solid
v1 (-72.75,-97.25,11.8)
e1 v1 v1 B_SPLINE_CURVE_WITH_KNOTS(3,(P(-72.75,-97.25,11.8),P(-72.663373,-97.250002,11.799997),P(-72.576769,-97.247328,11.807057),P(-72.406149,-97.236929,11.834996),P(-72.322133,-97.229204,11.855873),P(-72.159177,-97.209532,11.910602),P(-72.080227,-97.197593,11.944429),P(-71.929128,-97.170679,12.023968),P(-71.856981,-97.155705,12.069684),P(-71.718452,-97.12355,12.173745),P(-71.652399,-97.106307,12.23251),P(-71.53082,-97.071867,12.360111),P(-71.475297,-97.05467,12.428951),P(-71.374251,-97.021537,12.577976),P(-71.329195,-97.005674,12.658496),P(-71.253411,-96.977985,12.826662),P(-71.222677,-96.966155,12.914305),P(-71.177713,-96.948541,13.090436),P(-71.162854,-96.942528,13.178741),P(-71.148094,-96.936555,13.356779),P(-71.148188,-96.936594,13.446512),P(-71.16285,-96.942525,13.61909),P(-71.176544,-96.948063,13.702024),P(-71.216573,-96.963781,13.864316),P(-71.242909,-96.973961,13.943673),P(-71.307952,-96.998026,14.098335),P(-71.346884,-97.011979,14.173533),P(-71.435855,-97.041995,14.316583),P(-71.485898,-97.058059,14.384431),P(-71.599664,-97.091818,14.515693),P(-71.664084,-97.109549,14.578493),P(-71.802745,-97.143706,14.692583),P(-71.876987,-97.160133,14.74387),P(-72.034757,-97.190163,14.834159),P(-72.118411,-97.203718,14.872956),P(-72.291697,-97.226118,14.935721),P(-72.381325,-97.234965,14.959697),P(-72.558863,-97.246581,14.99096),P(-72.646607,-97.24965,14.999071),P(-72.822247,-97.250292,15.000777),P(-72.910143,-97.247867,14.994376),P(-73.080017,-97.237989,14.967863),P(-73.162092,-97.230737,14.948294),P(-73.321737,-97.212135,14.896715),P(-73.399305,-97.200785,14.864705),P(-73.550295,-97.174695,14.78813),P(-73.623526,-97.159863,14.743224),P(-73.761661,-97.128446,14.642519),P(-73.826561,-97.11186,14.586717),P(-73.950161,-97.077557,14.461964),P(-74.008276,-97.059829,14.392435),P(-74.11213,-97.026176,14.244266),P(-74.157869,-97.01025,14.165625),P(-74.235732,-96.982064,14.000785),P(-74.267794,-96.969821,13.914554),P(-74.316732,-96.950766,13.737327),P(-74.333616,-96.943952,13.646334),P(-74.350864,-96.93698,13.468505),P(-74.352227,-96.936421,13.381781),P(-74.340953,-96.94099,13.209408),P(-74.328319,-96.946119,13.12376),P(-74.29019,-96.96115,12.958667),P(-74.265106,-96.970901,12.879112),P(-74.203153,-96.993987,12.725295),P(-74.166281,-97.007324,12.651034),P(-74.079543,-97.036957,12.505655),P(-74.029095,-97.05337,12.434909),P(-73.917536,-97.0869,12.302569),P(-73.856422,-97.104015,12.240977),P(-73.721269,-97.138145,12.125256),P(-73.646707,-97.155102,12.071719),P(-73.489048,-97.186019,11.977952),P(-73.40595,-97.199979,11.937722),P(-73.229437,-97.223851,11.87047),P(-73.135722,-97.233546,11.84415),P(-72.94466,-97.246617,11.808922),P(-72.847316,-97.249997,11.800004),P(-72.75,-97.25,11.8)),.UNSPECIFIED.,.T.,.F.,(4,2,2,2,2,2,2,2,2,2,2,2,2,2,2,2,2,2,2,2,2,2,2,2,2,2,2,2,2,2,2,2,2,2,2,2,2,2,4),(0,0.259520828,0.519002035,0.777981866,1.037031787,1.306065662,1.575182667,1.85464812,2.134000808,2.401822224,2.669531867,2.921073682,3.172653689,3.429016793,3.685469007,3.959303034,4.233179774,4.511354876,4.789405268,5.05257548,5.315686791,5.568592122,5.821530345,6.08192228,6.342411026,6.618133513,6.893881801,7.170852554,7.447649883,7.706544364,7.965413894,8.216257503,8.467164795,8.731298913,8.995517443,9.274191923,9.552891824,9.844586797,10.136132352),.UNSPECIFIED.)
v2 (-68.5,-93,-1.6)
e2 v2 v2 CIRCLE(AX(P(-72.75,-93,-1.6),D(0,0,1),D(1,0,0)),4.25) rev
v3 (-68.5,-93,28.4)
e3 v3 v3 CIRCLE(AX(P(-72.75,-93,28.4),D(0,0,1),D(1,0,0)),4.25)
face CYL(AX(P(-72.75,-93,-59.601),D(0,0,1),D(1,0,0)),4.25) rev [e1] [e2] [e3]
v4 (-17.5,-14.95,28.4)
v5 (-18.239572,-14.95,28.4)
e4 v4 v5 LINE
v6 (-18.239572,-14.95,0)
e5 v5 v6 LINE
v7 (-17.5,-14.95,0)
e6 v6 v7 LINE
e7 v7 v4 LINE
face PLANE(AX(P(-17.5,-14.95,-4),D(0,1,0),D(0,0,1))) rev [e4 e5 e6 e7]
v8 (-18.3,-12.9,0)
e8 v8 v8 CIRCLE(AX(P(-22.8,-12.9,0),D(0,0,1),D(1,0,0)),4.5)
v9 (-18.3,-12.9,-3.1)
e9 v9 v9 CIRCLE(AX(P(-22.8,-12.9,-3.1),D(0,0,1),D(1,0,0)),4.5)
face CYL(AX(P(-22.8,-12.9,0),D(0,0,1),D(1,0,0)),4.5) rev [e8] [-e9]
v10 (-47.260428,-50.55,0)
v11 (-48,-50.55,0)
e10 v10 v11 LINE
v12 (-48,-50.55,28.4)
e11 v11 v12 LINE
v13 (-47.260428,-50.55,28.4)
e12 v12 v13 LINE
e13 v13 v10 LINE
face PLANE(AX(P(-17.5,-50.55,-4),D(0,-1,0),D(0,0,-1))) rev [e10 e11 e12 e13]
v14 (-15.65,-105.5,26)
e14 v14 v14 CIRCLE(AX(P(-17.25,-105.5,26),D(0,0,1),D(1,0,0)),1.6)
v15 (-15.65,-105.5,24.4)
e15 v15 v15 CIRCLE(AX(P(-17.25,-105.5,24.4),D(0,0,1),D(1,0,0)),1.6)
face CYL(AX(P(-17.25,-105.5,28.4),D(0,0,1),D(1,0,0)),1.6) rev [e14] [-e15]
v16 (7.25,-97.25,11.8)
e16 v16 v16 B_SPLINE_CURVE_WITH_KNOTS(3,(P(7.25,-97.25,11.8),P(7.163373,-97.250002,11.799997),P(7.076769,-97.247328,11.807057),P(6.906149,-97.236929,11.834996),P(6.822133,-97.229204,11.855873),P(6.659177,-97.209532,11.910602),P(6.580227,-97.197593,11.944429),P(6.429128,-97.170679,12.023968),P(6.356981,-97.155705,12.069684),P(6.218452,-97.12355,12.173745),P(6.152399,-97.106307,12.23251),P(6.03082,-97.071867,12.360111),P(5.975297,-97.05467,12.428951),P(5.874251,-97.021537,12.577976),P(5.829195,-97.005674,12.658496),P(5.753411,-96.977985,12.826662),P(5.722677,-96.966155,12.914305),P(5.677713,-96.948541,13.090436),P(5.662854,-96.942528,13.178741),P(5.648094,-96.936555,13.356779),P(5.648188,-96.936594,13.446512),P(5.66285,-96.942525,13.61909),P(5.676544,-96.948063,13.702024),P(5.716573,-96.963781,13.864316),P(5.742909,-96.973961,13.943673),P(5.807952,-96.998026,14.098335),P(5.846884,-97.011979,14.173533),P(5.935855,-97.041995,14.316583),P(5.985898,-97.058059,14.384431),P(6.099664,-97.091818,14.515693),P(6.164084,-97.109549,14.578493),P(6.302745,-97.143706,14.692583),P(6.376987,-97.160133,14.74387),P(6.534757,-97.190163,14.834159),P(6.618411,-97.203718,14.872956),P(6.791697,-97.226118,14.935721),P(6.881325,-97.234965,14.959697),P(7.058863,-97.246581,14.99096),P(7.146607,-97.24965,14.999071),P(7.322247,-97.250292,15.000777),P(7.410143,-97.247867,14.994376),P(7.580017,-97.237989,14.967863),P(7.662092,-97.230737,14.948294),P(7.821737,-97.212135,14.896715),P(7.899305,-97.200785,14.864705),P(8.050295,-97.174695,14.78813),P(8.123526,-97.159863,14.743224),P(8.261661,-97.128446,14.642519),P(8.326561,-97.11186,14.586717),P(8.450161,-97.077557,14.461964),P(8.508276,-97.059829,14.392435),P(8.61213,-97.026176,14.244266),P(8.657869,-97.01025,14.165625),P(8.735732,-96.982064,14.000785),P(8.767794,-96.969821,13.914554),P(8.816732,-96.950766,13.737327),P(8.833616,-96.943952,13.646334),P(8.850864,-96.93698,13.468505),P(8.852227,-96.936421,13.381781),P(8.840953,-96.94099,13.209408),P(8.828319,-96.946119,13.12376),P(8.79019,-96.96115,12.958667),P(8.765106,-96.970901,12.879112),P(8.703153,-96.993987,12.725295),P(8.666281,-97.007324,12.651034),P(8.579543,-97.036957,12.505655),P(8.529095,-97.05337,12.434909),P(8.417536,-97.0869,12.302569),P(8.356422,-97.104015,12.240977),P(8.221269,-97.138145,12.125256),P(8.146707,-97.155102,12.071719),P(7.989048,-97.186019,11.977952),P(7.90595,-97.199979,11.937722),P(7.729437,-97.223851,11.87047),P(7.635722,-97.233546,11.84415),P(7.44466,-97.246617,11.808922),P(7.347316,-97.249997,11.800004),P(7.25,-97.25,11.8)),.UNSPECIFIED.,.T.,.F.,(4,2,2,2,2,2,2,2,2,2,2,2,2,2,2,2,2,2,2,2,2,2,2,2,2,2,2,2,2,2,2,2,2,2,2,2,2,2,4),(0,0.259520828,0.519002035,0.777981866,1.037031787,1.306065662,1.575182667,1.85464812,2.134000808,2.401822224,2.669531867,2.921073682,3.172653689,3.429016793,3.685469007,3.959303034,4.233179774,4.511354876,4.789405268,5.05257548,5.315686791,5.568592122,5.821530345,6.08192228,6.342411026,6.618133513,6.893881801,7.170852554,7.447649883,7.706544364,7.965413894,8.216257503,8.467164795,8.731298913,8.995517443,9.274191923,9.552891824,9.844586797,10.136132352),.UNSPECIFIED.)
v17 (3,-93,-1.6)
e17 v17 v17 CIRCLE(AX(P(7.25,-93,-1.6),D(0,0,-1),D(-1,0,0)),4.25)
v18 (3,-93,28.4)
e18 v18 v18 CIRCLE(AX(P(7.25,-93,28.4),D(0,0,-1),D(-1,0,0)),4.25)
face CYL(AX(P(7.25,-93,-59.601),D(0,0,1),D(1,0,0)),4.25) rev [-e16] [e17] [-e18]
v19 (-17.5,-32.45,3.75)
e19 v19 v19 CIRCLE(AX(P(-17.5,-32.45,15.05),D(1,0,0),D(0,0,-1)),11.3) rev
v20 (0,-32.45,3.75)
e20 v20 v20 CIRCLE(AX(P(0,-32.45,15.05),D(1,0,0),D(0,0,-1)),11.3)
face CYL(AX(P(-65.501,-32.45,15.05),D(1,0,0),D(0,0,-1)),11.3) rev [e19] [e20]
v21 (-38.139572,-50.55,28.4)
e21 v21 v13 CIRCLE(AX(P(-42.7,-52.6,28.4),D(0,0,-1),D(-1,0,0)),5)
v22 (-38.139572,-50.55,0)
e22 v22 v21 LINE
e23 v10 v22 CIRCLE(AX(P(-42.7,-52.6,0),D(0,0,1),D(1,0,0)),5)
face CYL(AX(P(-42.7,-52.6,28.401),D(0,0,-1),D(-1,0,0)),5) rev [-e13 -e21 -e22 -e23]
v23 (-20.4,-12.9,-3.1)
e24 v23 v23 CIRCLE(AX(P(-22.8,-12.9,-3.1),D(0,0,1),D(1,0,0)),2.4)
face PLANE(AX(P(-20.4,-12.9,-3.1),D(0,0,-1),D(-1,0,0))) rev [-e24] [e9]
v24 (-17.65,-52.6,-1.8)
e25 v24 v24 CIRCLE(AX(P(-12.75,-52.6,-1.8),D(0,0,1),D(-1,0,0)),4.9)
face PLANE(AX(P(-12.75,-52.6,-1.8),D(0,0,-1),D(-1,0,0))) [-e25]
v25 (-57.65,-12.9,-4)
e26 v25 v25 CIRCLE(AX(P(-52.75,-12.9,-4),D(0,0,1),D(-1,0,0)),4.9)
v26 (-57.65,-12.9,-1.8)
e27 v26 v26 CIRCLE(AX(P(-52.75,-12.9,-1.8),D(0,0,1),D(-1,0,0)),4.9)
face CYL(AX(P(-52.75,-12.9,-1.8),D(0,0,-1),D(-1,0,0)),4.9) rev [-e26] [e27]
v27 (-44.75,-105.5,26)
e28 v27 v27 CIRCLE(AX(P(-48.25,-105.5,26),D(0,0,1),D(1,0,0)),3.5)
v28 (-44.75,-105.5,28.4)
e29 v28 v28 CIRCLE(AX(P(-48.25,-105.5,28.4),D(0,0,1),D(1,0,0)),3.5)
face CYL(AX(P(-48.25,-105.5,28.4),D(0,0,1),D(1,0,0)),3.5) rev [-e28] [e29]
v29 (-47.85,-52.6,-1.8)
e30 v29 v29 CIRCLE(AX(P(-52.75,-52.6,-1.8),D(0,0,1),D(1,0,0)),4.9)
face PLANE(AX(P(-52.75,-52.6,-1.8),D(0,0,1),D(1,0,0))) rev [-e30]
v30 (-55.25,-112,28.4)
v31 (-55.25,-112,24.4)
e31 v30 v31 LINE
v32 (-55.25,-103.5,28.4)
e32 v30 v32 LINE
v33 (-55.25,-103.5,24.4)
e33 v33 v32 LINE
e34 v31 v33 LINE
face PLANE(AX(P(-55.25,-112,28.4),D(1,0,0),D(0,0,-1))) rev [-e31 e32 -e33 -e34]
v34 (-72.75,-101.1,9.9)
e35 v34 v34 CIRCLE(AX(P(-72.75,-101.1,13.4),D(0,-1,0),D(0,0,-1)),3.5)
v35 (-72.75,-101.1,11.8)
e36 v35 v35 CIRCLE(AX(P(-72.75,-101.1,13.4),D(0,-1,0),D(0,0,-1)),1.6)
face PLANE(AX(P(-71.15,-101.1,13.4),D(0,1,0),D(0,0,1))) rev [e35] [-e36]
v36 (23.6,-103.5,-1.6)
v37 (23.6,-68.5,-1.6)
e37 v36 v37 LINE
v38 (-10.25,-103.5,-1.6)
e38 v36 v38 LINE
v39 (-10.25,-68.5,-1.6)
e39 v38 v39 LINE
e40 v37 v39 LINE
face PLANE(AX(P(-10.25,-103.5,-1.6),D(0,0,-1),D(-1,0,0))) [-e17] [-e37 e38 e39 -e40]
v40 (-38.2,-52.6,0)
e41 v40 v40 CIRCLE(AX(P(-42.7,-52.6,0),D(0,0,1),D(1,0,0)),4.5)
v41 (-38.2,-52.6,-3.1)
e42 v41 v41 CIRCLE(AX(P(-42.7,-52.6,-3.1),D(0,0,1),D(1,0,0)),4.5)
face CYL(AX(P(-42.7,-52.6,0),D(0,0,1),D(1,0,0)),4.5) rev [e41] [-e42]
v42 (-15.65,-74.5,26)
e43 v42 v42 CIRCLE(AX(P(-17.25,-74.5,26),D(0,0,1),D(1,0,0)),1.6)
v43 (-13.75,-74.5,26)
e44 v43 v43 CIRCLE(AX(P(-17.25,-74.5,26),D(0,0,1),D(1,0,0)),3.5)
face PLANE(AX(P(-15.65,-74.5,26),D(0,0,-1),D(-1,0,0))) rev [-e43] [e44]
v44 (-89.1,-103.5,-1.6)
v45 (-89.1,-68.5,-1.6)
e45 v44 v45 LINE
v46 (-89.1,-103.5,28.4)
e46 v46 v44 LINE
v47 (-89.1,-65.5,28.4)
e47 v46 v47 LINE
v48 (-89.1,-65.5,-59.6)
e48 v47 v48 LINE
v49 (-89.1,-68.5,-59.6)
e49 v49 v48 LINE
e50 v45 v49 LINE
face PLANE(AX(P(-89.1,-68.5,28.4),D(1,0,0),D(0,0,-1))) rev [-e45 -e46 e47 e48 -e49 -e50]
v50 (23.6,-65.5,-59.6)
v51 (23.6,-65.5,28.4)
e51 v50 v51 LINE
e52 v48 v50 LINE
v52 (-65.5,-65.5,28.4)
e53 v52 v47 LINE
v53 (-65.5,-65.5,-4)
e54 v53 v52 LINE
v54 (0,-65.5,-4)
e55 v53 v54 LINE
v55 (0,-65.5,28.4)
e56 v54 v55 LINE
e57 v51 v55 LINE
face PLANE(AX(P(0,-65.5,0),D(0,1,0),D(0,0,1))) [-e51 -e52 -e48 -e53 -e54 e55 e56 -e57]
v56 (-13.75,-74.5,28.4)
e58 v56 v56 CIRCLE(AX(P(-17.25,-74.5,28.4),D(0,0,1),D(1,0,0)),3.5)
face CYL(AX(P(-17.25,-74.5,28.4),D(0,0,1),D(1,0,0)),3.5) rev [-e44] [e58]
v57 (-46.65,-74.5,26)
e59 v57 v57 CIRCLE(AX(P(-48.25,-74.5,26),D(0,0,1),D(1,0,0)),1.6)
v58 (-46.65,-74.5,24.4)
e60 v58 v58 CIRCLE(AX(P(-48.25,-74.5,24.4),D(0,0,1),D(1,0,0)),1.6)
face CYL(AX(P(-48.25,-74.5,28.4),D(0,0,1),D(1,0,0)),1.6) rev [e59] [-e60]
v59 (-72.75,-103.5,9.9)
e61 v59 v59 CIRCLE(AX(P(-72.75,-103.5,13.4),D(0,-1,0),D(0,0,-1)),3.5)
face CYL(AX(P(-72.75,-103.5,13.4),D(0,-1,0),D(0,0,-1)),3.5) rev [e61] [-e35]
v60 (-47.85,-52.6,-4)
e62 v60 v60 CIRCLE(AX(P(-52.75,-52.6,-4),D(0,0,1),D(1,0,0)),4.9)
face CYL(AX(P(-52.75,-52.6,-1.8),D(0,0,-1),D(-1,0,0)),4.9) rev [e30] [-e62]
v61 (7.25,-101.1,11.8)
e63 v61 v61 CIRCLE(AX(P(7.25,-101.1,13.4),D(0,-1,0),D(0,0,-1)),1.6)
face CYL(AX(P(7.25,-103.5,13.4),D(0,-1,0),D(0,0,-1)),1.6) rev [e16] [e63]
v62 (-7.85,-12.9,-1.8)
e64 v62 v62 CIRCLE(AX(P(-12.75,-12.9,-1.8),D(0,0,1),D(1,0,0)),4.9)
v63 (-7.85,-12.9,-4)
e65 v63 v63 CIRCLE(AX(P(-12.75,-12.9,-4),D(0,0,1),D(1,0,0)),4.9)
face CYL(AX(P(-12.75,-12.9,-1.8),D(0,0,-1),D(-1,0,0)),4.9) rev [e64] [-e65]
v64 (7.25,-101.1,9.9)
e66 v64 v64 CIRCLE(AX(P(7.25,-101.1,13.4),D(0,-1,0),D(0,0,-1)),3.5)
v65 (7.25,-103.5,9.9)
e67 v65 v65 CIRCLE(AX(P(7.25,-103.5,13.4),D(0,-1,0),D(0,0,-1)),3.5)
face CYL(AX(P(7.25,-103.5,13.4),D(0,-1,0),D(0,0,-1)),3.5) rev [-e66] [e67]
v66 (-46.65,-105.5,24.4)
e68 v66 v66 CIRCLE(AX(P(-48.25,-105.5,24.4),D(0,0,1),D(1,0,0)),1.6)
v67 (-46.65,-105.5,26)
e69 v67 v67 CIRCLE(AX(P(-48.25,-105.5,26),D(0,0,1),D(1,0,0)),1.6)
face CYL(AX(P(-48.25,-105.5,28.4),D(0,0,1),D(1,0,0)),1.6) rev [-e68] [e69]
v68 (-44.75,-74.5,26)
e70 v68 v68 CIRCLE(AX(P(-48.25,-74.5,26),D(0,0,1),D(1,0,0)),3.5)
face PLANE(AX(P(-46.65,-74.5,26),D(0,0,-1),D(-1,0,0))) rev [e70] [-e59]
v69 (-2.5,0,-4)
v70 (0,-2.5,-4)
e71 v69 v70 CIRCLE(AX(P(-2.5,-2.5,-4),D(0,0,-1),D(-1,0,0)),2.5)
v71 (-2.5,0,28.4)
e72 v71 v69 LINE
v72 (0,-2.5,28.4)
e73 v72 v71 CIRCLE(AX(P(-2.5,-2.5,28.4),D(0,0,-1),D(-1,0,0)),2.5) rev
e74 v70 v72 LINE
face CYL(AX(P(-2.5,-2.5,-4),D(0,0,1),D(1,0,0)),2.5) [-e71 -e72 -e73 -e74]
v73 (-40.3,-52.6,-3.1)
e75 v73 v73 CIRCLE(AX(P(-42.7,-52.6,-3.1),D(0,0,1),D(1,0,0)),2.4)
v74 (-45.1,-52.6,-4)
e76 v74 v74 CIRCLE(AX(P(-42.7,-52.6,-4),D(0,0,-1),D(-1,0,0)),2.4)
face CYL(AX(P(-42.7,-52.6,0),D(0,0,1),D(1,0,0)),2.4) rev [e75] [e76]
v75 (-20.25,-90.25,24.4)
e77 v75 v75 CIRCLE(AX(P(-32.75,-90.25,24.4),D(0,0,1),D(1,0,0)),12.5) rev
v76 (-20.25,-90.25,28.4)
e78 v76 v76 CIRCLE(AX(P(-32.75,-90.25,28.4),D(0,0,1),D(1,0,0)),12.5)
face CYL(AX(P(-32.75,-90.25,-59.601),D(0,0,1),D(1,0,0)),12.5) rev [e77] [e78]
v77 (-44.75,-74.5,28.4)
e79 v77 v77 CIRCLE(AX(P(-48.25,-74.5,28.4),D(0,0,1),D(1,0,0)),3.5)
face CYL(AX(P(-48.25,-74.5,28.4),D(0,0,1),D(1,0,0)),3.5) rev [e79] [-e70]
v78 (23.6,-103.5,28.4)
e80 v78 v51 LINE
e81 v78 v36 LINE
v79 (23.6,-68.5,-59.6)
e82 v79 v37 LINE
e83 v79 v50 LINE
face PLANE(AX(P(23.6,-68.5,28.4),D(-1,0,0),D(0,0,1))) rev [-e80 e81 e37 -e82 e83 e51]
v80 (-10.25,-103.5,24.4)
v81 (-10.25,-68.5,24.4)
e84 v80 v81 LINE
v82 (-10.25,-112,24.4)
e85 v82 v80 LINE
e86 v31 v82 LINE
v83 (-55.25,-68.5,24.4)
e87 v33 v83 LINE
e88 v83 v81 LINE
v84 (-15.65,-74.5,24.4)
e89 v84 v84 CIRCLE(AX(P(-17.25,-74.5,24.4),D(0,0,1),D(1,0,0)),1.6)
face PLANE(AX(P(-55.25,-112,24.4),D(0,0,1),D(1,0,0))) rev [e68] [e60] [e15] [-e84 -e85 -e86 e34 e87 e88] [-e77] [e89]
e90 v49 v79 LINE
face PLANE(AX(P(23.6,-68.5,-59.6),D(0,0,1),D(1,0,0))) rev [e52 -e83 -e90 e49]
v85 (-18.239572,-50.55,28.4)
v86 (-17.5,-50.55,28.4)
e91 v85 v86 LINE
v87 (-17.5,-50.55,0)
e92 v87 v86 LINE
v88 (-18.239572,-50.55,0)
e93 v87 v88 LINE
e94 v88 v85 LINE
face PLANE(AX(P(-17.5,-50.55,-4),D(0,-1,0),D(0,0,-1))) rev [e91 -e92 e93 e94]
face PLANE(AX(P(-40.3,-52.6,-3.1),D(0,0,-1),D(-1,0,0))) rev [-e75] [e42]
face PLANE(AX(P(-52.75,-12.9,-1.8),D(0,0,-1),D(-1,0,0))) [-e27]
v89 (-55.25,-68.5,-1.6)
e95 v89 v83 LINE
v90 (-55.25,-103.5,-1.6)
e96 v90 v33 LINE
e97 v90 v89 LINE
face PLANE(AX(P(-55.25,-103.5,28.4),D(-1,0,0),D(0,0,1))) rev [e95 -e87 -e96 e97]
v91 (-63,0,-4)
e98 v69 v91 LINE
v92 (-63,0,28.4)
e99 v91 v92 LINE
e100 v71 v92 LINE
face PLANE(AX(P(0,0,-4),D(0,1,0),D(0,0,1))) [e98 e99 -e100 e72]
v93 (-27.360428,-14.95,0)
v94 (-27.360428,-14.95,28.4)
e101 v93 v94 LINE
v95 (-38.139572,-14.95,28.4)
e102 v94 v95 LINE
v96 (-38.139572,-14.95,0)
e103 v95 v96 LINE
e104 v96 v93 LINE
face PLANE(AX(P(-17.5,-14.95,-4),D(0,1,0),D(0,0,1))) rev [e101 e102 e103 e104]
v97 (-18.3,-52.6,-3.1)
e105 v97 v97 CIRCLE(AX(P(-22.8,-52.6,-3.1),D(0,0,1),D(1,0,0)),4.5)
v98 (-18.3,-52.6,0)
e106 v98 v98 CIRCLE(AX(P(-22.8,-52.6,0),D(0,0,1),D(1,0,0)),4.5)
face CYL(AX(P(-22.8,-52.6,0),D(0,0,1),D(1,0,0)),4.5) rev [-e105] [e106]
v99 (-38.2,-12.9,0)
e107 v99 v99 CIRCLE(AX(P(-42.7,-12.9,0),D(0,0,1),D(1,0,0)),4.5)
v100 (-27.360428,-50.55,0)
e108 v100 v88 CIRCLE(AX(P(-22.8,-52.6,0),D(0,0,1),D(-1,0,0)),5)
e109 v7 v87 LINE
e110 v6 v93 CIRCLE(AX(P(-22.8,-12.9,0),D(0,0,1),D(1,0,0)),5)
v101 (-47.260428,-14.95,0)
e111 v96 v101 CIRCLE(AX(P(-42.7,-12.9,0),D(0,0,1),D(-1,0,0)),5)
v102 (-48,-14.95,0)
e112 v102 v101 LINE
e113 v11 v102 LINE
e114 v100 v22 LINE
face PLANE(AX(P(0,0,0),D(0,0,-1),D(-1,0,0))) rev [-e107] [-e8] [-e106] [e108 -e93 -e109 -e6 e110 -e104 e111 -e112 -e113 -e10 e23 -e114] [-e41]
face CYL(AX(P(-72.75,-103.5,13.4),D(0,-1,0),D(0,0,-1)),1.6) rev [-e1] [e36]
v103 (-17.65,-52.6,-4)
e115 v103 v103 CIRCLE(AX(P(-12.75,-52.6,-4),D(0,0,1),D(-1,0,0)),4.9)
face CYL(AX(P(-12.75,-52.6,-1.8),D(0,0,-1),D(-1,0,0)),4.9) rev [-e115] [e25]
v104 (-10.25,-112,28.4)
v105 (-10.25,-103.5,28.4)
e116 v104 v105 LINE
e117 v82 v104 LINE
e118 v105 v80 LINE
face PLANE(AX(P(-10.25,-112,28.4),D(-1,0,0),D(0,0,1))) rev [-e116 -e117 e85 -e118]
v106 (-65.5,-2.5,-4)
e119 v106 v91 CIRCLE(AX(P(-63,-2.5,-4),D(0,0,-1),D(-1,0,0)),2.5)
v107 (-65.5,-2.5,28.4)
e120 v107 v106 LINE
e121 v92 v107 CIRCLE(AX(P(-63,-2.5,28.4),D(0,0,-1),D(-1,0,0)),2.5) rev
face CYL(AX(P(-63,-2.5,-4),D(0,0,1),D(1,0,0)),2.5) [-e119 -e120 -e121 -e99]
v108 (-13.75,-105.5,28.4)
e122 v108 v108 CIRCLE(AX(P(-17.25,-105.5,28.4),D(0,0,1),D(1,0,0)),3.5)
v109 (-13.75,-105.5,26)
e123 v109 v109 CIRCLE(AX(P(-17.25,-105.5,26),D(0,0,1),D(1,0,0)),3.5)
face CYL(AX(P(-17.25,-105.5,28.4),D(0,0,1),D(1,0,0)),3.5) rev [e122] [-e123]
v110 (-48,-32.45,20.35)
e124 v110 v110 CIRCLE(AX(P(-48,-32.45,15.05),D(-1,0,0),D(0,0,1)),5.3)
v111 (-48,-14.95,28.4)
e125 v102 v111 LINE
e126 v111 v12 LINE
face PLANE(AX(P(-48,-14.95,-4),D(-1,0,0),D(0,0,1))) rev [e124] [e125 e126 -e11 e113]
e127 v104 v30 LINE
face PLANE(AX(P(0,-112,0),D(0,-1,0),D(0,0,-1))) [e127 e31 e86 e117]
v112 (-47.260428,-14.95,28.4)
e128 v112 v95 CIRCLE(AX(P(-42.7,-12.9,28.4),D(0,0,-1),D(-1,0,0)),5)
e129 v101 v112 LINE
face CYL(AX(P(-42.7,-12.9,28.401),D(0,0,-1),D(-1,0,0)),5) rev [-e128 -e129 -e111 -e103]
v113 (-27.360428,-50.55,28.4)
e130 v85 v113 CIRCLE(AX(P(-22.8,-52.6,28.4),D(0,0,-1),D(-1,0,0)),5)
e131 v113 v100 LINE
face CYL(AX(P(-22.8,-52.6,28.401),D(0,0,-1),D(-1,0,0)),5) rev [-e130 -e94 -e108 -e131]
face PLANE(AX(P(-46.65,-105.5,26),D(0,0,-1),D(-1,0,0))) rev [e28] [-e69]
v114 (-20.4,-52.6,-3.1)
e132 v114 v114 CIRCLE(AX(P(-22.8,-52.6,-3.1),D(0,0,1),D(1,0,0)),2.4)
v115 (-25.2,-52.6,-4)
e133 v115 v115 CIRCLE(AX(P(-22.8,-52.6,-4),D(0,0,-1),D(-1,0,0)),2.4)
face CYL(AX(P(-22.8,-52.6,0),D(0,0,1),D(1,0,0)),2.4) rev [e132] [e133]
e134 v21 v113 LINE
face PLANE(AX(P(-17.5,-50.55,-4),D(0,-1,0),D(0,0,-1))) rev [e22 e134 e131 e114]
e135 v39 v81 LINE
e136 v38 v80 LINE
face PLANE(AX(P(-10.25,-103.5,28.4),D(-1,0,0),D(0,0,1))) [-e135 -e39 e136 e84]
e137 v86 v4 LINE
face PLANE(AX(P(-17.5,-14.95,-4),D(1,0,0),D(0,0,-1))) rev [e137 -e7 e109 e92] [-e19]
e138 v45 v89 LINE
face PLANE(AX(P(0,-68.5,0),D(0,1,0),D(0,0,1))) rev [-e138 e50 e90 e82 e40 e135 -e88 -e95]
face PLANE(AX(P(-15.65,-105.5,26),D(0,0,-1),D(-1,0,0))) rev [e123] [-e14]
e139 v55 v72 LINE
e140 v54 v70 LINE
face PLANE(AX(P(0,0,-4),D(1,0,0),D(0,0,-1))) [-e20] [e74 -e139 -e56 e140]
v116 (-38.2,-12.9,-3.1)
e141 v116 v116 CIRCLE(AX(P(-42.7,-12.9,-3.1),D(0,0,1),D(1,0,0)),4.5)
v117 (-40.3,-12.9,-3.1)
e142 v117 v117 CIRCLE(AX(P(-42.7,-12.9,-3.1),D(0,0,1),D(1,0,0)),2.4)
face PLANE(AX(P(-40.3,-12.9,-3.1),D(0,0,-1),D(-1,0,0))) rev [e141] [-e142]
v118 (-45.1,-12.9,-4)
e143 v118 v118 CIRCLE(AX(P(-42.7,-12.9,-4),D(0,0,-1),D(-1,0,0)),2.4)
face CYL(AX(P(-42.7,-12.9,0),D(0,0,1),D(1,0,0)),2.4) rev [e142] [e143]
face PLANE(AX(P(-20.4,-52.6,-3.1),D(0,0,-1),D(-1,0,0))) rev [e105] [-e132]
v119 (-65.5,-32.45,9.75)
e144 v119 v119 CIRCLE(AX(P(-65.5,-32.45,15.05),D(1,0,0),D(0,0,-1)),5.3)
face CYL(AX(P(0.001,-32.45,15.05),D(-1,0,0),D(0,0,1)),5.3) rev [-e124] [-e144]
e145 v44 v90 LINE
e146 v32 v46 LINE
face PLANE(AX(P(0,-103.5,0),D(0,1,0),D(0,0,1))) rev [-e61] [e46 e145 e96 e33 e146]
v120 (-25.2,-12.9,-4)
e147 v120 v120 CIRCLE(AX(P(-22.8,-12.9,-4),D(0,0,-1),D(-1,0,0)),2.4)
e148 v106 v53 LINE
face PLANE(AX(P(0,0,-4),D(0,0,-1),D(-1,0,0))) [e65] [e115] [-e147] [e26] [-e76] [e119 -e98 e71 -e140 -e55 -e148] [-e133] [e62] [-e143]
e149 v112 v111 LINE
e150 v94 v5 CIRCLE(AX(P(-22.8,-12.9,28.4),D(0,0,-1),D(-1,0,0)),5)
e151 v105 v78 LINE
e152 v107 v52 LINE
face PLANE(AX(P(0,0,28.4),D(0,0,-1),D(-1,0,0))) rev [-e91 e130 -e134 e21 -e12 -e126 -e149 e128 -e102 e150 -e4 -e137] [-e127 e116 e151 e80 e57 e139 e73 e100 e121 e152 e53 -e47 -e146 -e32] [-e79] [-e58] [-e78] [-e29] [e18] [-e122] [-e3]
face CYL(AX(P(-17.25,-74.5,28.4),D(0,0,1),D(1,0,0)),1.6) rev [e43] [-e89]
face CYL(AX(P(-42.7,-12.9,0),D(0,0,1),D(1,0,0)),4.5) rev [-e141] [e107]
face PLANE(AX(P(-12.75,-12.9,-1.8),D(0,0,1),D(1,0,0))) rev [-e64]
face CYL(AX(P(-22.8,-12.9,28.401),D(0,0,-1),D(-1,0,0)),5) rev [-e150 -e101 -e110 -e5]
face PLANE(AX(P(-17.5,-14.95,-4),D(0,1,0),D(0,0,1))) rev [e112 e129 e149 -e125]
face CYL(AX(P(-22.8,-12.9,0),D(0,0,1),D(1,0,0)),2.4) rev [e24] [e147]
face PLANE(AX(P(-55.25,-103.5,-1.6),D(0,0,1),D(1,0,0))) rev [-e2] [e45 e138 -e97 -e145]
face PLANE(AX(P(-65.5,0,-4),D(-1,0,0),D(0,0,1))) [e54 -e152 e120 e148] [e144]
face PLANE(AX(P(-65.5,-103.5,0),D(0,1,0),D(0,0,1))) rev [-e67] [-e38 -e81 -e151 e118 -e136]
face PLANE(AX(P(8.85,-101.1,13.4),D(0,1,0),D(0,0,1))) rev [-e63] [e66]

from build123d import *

# Parameters (mm, degrees)
BOSS_EXTRUDE1_DEPTH                              = 28.4
BOSS_EXTRUDE1_DEPTH_BACK                         = 4
SKETCH1_W                                        = 65.5
SKETCH1_H                                        = 65.5
SKETCH1_W_2                                      = 30.5
SKETCH1_H_2                                      = 35.6
CUT_EXTRUDE1_REACH                               = 98.887
SKETCH5_R                                        = 11.3
CUT_EXTRUDE4_REACH                               = 98.887
SKETCH7_R                                        = 5.3
SKETCH8_W                                        = 30.5
SKETCH8_H                                        = 35.6
BOSS_EXTRUDE2_DEPTH                              = 4
SKETCH9_R                                        = 4.9
CUT_EXTRUDE5_DEPTH                               = 2.2
FILLET1_R                                        = 2.5
CUT_EXTRUDE7_REACH                               = 98.887
SKETCH10_R                                       = 5
CBORE_FOR_M4_PAN_HEAD_MACHINE_SCREW1_D           = 4.8
CBORE_FOR_M4_PAN_HEAD_MACHINE_SCREW1_DEPTH       = 8
CBORE_FOR_M4_PAN_HEAD_MACHINE_SCREW1_CBORE_D     = 9
CBORE_FOR_M4_PAN_HEAD_MACHINE_SCREW1_CBORE_DEPTH = 3.1
CBORE_FOR_M4_PAN_HEAD_MACHINE_SCREW1_TIP         = 1.442065486
SKETCH23_W                                       = 112.7
SKETCH23_H                                       = 88
BOSS_EXTRUDE3_DEPTH                              = 3
SKETCH24_W                                       = 45
SKETCH24_H                                       = 4
BOSS_EXTRUDE4_DEPTH                              = 43.5
CBORE_FOR_M3_PAN_HEAD_MACHINE_SCREW1_D           = 3.2
CBORE_FOR_M3_PAN_HEAD_MACHINE_SCREW1_CBORE_D     = 7
CBORE_FOR_M3_PAN_HEAD_MACHINE_SCREW1_CBORE_DEPTH = 2.4
CUT_EXTRUDE8_REACH                               = 170.008
SKETCH28_R                                       = 12.5
SKETCH30_W                                       = 33.85
SKETCH30_H                                       = 30
BOSS_EXTRUDE5_DEPTH                              = 35
CUT_EXTRUDE10_REACH                              = 170.008
SKETCH31_R                                       = 4.25
CBORE_START                                      = -103.5
CBORE_FOR_M3_PAN_HEAD_MACHINE_SCREW2_OUT_R       = 3.5
CBORE_FOR_M3_PAN_HEAD_MACHINE_SCREW2_DEPTH       = 2.4
CBORE_START_2                                    = -101.1
CBORE_FOR_M3_PAN_HEAD_MACHINE_SCREW2_2_O_R       = 1.6
CBORE_FOR_M3_PAN_HEAD_MACHINE_SCREW2_2_DEPTH     = 4.162673424


# Read off the part's stored shape, not the designer's step: CBORE for M3 Pan Head Machine Screw2
with BuildPart() as part:
    # Sketch1 → Boss-Extrude1 (new, two sides: drawn at the far end of the back side and taken through both)
    with BuildSketch(Plane.XY.offset(-BOSS_EXTRUDE1_DEPTH_BACK)):
        with Locations((-32.75, -32.75)):
            Rectangle(SKETCH1_W, SKETCH1_H)
        with Locations((-32.75, -32.75)):
            Rectangle(SKETCH1_W_2, SKETCH1_H_2, mode=Mode.SUBTRACT)
    extrude(amount=BOSS_EXTRUDE1_DEPTH + BOSS_EXTRUDE1_DEPTH_BACK)

    # Sketch5 → Cut-Extrude1 (cut, up to next)
    with BuildSketch(Plane(origin=(0, 0, 0), x_dir=(0, 0, -1), z_dir=(1, 0, 0)), mode=Mode.PRIVATE) as cut_extrude1_sk1:
        with Locations((-15.05, -32.45)):
            Circle(SKETCH5_R)
    cut_extrude1_tool1 = extrude(cut_extrude1_sk1.sketch, amount=-CUT_EXTRUDE1_REACH, mode=Mode.PRIVATE) & part.part
    add(cut_extrude1_tool1.solids().sort_by_distance((0, -32.45, 15.05))[0], mode=Mode.SUBTRACT)

    # Sketch7 → Cut-Extrude4 (cut, up to next)
    with BuildSketch(Plane(origin=(-65.5, 0, 0), x_dir=(0, 0, -1), z_dir=(1, 0, 0)), mode=Mode.PRIVATE) as cut_extrude4_sk1:
        with Locations(Location((-15.05, -32.45, 0), (0, 0, 180))):
            Circle(SKETCH7_R)
    cut_extrude4_tool1 = extrude(cut_extrude4_sk1.sketch, amount=CUT_EXTRUDE4_REACH, mode=Mode.PRIVATE) & part.part
    add(cut_extrude4_tool1.solids().sort_by_distance((-65.5, -32.45, 15.05))[0], mode=Mode.SUBTRACT)

    # Sketch8 → Boss-Extrude2 (add)
    with BuildSketch(Plane(origin=(0, 0, -4), x_dir=(-1, 0, 0), z_dir=(0, 0, -1))):
        with Locations((32.75, -32.75)):
            Rectangle(SKETCH8_W, SKETCH8_H)
    extrude(amount=-BOSS_EXTRUDE2_DEPTH)

    # Sketch9 → Cut-Extrude5 (cut)
    with BuildSketch(Plane.XY.offset(-4)):
        with Locations((-12.75, -12.9)):
            Circle(SKETCH9_R)
        with Locations(Location((-52.75, -12.9, 0), (0, 0, 180))):
            Circle(SKETCH9_R)
        with Locations((-52.75, -52.6)):
            Circle(SKETCH9_R)
        with Locations(Location((-12.75, -52.6, 0), (0, 0, 180))):
            Circle(SKETCH9_R)
    extrude(amount=CUT_EXTRUDE5_DEPTH, mode=Mode.SUBTRACT)

    # Fillet1
    fillet1_edges = [part.edges().sort_by_distance(p)[0] for p in [
        (-65.5, 0, 12.2),
        (0, 0, 12.2),
    ]]
    fillet(fillet1_edges, radius=FILLET1_R)

    # Sketch10 → Cut-Extrude7 (cut, up to next)
    with BuildSketch(Plane.XY, mode=Mode.PRIVATE) as cut_extrude7_sk1:
        with Locations((-22.8, -12.9)):
            Circle(SKETCH10_R)
    cut_extrude7_tool1 = extrude(cut_extrude7_sk1.sketch, amount=CUT_EXTRUDE7_REACH, mode=Mode.PRIVATE) & part.part
    # Sketch10 → Cut-Extrude7 (cut, up to next)
    with BuildSketch(Plane.XY, mode=Mode.PRIVATE) as cut_extrude7_sk2:
        with Locations((-42.7, -12.9)):
            Circle(SKETCH10_R)
    cut_extrude7_tool2 = extrude(cut_extrude7_sk2.sketch, amount=CUT_EXTRUDE7_REACH, mode=Mode.PRIVATE) & part.part
    # Sketch10 → Cut-Extrude7 (cut, up to next)
    with BuildSketch(Plane.XY, mode=Mode.PRIVATE) as cut_extrude7_sk3:
        with Locations((-22.8, -52.6)):
            Circle(SKETCH10_R)
    cut_extrude7_tool3 = extrude(cut_extrude7_sk3.sketch, amount=CUT_EXTRUDE7_REACH, mode=Mode.PRIVATE) & part.part
    # Sketch10 → Cut-Extrude7 (cut, up to next)
    with BuildSketch(Plane.XY, mode=Mode.PRIVATE) as cut_extrude7_sk4:
        with Locations((-42.7, -52.6)):
            Circle(SKETCH10_R)
    cut_extrude7_tool4 = extrude(cut_extrude7_sk4.sketch, amount=CUT_EXTRUDE7_REACH, mode=Mode.PRIVATE) & part.part
    add(cut_extrude7_tool1.solids().sort_by_distance((-22.8, -12.9, 0))[0], mode=Mode.SUBTRACT)
    add(cut_extrude7_tool2.solids().sort_by_distance((-42.7, -12.9, 0))[0], mode=Mode.SUBTRACT)
    add(cut_extrude7_tool3.solids().sort_by_distance((-22.8, -52.6, 0))[0], mode=Mode.SUBTRACT)
    add(cut_extrude7_tool4.solids().sort_by_distance((-42.7, -52.6, 0))[0], mode=Mode.SUBTRACT)

    # CBORE for M4 Pan Head Machine Screw1
    with Locations(Plane(origin=(-42.7, -12.9, 0), x_dir=(1, 0, 0), z_dir=(0, 0, 1))):
        with Locations((0, 0), (19.9, 0), (0, -39.7), (19.9, -39.7)):
            CounterBoreHole(CBORE_FOR_M4_PAN_HEAD_MACHINE_SCREW1_D / 2, CBORE_FOR_M4_PAN_HEAD_MACHINE_SCREW1_CBORE_D / 2, CBORE_FOR_M4_PAN_HEAD_MACHINE_SCREW1_CBORE_DEPTH, depth=CBORE_FOR_M4_PAN_HEAD_MACHINE_SCREW1_DEPTH)
            with Locations((0, 0, -(CBORE_FOR_M4_PAN_HEAD_MACHINE_SCREW1_DEPTH + CBORE_FOR_M4_PAN_HEAD_MACHINE_SCREW1_TIP / 2))):  # 118° drill point
                Cone(0, CBORE_FOR_M4_PAN_HEAD_MACHINE_SCREW1_D / 2, CBORE_FOR_M4_PAN_HEAD_MACHINE_SCREW1_TIP, mode=Mode.SUBTRACT)

    # Sketch23 → Boss-Extrude3 (add)
    with BuildSketch(Plane.XZ.offset(65.5)):
        with Locations((-32.75, -15.6)):
            Rectangle(SKETCH23_W, SKETCH23_H)
    extrude(amount=BOSS_EXTRUDE3_DEPTH)

    # Sketch24 → Boss-Extrude4 (add)
    with BuildSketch(Plane(origin=(0, -68.5, 0), x_dir=(-1, 0, 0), z_dir=(0, -1, 0))):
        with Locations((32.75, -26.4)):
            Rectangle(SKETCH24_W, SKETCH24_H)
    extrude(amount=BOSS_EXTRUDE4_DEPTH)

    # CBORE for M3 Pan Head Machine Screw1 (through all)
    with Locations(Plane.XY.offset(28.4)):
        with Locations((-48.25, -74.5), (-48.25, -105.5)):
            cbore_for_m3_pan_head_machine_screw1 = CounterBoreHole(CBORE_FOR_M3_PAN_HEAD_MACHINE_SCREW1_D / 2, CBORE_FOR_M3_PAN_HEAD_MACHINE_SCREW1_CBORE_D / 2, CBORE_FOR_M3_PAN_HEAD_MACHINE_SCREW1_CBORE_DEPTH)

    # Sketch28 → Cut-Extrude8 (cut, up to next)
    with BuildSketch(Plane.XY.offset(28.4), mode=Mode.PRIVATE) as cut_extrude8_sk1:
        with Locations((-32.75, -90.25)):
            Circle(SKETCH28_R)
    cut_extrude8_tool1 = extrude(cut_extrude8_sk1.sketch, amount=-CUT_EXTRUDE8_REACH, mode=Mode.PRIVATE) & part.part
    add(cut_extrude8_tool1.solids().sort_by_distance((-32.75, -90.25, 28.4))[0], mode=Mode.SUBTRACT)

    # Mirror1: CBORE for M3 Pan Head Machine Screw1 across plane
    add(cbore_for_m3_pan_head_machine_screw1.mirror(Plane(origin=(-32.75, 0, 0), x_dir=(0, 0, 1), z_dir=(1, 0, 0))), mode=Mode.SUBTRACT)

    # Sketch30 → Boss-Extrude5 (add)
    with BuildSketch(Plane(origin=(0, -68.5, 0), x_dir=(-1, 0, 0), z_dir=(0, -1, 0))):
        with Locations((72.175, -13.4)):
            Rectangle(SKETCH30_W, SKETCH30_H)
    boss_extrude5 = extrude(amount=BOSS_EXTRUDE5_DEPTH)

    # Sketch31 → Cut-Extrude10 (cut, up to next)
    with BuildSketch(Plane.XY.offset(28.4), mode=Mode.PRIVATE) as cut_extrude10_sk1:
        with Locations((-72.75, -93)):
            Circle(SKETCH31_R)
    cut_extrude10_tool1 = extrude(cut_extrude10_sk1.sketch, amount=-CUT_EXTRUDE10_REACH, mode=Mode.PRIVATE) & part.part
    cut_extrude10 = cut_extrude10_tool1.solids().sort_by_distance((-72.75, -93, 28.4))[0]
    add(cut_extrude10, mode=Mode.SUBTRACT)

    # CBORE for M3 Pan Head Machine Screw2 out → CBORE for M3 Pan Head Machine Screw2 (cut)
    with BuildSketch(Plane(origin=(0, 0, 0), x_dir=(1, 0, 0), z_dir=(0, 1, 0)).offset(CBORE_START)):
        with Locations((-72.75, -13.4)):
            Circle(CBORE_FOR_M3_PAN_HEAD_MACHINE_SCREW2_OUT_R)
    cbore_for_m3_pan_head_machine_screw2 = extrude(amount=CBORE_FOR_M3_PAN_HEAD_MACHINE_SCREW2_DEPTH, mode=Mode.SUBTRACT)

    # CBORE for M3 Pan Head Machine Screw2 2 o → CBORE for M3 Pan Head Machine Screw2 2 (cut)
    with BuildSketch(Plane(origin=(0, 0, 0), x_dir=(1, 0, 0), z_dir=(0, 1, 0)).offset(CBORE_START_2)):
        with Locations((-72.75, -13.4)):
            Circle(CBORE_FOR_M3_PAN_HEAD_MACHINE_SCREW2_2_O_R)
    cbore_for_m3_pan_head_machine_screw2_2 = extrude(amount=CBORE_FOR_M3_PAN_HEAD_MACHINE_SCREW2_2_DEPTH, mode=Mode.SUBTRACT)

    # Mirror2: Boss-Extrude5, Cut-Extrude10, CBORE for M3 Pan Head Machine Screw2, CBORE for M3 Pan Head Machine Screw2 2 across plane
    add(boss_extrude5.mirror(Plane(origin=(-32.75, 0, 0), x_dir=(0, 0, 1), z_dir=(1, 0, 0))))
    add(cut_extrude10.mirror(Plane(origin=(-32.75, 0, 0), x_dir=(0, 0, 1), z_dir=(1, 0, 0))), mode=Mode.SUBTRACT)
    add(cbore_for_m3_pan_head_machine_screw2.mirror(Plane(origin=(-32.75, 0, 0), x_dir=(0, 0, 1), z_dir=(1, 0, 0))), mode=Mode.SUBTRACT)
    add(cbore_for_m3_pan_head_machine_screw2_2.mirror(Plane(origin=(-32.75, 0, 0), x_dir=(0, 0, 1), z_dir=(1, 0, 0))), mode=Mode.SUBTRACT)


solid = part.part
